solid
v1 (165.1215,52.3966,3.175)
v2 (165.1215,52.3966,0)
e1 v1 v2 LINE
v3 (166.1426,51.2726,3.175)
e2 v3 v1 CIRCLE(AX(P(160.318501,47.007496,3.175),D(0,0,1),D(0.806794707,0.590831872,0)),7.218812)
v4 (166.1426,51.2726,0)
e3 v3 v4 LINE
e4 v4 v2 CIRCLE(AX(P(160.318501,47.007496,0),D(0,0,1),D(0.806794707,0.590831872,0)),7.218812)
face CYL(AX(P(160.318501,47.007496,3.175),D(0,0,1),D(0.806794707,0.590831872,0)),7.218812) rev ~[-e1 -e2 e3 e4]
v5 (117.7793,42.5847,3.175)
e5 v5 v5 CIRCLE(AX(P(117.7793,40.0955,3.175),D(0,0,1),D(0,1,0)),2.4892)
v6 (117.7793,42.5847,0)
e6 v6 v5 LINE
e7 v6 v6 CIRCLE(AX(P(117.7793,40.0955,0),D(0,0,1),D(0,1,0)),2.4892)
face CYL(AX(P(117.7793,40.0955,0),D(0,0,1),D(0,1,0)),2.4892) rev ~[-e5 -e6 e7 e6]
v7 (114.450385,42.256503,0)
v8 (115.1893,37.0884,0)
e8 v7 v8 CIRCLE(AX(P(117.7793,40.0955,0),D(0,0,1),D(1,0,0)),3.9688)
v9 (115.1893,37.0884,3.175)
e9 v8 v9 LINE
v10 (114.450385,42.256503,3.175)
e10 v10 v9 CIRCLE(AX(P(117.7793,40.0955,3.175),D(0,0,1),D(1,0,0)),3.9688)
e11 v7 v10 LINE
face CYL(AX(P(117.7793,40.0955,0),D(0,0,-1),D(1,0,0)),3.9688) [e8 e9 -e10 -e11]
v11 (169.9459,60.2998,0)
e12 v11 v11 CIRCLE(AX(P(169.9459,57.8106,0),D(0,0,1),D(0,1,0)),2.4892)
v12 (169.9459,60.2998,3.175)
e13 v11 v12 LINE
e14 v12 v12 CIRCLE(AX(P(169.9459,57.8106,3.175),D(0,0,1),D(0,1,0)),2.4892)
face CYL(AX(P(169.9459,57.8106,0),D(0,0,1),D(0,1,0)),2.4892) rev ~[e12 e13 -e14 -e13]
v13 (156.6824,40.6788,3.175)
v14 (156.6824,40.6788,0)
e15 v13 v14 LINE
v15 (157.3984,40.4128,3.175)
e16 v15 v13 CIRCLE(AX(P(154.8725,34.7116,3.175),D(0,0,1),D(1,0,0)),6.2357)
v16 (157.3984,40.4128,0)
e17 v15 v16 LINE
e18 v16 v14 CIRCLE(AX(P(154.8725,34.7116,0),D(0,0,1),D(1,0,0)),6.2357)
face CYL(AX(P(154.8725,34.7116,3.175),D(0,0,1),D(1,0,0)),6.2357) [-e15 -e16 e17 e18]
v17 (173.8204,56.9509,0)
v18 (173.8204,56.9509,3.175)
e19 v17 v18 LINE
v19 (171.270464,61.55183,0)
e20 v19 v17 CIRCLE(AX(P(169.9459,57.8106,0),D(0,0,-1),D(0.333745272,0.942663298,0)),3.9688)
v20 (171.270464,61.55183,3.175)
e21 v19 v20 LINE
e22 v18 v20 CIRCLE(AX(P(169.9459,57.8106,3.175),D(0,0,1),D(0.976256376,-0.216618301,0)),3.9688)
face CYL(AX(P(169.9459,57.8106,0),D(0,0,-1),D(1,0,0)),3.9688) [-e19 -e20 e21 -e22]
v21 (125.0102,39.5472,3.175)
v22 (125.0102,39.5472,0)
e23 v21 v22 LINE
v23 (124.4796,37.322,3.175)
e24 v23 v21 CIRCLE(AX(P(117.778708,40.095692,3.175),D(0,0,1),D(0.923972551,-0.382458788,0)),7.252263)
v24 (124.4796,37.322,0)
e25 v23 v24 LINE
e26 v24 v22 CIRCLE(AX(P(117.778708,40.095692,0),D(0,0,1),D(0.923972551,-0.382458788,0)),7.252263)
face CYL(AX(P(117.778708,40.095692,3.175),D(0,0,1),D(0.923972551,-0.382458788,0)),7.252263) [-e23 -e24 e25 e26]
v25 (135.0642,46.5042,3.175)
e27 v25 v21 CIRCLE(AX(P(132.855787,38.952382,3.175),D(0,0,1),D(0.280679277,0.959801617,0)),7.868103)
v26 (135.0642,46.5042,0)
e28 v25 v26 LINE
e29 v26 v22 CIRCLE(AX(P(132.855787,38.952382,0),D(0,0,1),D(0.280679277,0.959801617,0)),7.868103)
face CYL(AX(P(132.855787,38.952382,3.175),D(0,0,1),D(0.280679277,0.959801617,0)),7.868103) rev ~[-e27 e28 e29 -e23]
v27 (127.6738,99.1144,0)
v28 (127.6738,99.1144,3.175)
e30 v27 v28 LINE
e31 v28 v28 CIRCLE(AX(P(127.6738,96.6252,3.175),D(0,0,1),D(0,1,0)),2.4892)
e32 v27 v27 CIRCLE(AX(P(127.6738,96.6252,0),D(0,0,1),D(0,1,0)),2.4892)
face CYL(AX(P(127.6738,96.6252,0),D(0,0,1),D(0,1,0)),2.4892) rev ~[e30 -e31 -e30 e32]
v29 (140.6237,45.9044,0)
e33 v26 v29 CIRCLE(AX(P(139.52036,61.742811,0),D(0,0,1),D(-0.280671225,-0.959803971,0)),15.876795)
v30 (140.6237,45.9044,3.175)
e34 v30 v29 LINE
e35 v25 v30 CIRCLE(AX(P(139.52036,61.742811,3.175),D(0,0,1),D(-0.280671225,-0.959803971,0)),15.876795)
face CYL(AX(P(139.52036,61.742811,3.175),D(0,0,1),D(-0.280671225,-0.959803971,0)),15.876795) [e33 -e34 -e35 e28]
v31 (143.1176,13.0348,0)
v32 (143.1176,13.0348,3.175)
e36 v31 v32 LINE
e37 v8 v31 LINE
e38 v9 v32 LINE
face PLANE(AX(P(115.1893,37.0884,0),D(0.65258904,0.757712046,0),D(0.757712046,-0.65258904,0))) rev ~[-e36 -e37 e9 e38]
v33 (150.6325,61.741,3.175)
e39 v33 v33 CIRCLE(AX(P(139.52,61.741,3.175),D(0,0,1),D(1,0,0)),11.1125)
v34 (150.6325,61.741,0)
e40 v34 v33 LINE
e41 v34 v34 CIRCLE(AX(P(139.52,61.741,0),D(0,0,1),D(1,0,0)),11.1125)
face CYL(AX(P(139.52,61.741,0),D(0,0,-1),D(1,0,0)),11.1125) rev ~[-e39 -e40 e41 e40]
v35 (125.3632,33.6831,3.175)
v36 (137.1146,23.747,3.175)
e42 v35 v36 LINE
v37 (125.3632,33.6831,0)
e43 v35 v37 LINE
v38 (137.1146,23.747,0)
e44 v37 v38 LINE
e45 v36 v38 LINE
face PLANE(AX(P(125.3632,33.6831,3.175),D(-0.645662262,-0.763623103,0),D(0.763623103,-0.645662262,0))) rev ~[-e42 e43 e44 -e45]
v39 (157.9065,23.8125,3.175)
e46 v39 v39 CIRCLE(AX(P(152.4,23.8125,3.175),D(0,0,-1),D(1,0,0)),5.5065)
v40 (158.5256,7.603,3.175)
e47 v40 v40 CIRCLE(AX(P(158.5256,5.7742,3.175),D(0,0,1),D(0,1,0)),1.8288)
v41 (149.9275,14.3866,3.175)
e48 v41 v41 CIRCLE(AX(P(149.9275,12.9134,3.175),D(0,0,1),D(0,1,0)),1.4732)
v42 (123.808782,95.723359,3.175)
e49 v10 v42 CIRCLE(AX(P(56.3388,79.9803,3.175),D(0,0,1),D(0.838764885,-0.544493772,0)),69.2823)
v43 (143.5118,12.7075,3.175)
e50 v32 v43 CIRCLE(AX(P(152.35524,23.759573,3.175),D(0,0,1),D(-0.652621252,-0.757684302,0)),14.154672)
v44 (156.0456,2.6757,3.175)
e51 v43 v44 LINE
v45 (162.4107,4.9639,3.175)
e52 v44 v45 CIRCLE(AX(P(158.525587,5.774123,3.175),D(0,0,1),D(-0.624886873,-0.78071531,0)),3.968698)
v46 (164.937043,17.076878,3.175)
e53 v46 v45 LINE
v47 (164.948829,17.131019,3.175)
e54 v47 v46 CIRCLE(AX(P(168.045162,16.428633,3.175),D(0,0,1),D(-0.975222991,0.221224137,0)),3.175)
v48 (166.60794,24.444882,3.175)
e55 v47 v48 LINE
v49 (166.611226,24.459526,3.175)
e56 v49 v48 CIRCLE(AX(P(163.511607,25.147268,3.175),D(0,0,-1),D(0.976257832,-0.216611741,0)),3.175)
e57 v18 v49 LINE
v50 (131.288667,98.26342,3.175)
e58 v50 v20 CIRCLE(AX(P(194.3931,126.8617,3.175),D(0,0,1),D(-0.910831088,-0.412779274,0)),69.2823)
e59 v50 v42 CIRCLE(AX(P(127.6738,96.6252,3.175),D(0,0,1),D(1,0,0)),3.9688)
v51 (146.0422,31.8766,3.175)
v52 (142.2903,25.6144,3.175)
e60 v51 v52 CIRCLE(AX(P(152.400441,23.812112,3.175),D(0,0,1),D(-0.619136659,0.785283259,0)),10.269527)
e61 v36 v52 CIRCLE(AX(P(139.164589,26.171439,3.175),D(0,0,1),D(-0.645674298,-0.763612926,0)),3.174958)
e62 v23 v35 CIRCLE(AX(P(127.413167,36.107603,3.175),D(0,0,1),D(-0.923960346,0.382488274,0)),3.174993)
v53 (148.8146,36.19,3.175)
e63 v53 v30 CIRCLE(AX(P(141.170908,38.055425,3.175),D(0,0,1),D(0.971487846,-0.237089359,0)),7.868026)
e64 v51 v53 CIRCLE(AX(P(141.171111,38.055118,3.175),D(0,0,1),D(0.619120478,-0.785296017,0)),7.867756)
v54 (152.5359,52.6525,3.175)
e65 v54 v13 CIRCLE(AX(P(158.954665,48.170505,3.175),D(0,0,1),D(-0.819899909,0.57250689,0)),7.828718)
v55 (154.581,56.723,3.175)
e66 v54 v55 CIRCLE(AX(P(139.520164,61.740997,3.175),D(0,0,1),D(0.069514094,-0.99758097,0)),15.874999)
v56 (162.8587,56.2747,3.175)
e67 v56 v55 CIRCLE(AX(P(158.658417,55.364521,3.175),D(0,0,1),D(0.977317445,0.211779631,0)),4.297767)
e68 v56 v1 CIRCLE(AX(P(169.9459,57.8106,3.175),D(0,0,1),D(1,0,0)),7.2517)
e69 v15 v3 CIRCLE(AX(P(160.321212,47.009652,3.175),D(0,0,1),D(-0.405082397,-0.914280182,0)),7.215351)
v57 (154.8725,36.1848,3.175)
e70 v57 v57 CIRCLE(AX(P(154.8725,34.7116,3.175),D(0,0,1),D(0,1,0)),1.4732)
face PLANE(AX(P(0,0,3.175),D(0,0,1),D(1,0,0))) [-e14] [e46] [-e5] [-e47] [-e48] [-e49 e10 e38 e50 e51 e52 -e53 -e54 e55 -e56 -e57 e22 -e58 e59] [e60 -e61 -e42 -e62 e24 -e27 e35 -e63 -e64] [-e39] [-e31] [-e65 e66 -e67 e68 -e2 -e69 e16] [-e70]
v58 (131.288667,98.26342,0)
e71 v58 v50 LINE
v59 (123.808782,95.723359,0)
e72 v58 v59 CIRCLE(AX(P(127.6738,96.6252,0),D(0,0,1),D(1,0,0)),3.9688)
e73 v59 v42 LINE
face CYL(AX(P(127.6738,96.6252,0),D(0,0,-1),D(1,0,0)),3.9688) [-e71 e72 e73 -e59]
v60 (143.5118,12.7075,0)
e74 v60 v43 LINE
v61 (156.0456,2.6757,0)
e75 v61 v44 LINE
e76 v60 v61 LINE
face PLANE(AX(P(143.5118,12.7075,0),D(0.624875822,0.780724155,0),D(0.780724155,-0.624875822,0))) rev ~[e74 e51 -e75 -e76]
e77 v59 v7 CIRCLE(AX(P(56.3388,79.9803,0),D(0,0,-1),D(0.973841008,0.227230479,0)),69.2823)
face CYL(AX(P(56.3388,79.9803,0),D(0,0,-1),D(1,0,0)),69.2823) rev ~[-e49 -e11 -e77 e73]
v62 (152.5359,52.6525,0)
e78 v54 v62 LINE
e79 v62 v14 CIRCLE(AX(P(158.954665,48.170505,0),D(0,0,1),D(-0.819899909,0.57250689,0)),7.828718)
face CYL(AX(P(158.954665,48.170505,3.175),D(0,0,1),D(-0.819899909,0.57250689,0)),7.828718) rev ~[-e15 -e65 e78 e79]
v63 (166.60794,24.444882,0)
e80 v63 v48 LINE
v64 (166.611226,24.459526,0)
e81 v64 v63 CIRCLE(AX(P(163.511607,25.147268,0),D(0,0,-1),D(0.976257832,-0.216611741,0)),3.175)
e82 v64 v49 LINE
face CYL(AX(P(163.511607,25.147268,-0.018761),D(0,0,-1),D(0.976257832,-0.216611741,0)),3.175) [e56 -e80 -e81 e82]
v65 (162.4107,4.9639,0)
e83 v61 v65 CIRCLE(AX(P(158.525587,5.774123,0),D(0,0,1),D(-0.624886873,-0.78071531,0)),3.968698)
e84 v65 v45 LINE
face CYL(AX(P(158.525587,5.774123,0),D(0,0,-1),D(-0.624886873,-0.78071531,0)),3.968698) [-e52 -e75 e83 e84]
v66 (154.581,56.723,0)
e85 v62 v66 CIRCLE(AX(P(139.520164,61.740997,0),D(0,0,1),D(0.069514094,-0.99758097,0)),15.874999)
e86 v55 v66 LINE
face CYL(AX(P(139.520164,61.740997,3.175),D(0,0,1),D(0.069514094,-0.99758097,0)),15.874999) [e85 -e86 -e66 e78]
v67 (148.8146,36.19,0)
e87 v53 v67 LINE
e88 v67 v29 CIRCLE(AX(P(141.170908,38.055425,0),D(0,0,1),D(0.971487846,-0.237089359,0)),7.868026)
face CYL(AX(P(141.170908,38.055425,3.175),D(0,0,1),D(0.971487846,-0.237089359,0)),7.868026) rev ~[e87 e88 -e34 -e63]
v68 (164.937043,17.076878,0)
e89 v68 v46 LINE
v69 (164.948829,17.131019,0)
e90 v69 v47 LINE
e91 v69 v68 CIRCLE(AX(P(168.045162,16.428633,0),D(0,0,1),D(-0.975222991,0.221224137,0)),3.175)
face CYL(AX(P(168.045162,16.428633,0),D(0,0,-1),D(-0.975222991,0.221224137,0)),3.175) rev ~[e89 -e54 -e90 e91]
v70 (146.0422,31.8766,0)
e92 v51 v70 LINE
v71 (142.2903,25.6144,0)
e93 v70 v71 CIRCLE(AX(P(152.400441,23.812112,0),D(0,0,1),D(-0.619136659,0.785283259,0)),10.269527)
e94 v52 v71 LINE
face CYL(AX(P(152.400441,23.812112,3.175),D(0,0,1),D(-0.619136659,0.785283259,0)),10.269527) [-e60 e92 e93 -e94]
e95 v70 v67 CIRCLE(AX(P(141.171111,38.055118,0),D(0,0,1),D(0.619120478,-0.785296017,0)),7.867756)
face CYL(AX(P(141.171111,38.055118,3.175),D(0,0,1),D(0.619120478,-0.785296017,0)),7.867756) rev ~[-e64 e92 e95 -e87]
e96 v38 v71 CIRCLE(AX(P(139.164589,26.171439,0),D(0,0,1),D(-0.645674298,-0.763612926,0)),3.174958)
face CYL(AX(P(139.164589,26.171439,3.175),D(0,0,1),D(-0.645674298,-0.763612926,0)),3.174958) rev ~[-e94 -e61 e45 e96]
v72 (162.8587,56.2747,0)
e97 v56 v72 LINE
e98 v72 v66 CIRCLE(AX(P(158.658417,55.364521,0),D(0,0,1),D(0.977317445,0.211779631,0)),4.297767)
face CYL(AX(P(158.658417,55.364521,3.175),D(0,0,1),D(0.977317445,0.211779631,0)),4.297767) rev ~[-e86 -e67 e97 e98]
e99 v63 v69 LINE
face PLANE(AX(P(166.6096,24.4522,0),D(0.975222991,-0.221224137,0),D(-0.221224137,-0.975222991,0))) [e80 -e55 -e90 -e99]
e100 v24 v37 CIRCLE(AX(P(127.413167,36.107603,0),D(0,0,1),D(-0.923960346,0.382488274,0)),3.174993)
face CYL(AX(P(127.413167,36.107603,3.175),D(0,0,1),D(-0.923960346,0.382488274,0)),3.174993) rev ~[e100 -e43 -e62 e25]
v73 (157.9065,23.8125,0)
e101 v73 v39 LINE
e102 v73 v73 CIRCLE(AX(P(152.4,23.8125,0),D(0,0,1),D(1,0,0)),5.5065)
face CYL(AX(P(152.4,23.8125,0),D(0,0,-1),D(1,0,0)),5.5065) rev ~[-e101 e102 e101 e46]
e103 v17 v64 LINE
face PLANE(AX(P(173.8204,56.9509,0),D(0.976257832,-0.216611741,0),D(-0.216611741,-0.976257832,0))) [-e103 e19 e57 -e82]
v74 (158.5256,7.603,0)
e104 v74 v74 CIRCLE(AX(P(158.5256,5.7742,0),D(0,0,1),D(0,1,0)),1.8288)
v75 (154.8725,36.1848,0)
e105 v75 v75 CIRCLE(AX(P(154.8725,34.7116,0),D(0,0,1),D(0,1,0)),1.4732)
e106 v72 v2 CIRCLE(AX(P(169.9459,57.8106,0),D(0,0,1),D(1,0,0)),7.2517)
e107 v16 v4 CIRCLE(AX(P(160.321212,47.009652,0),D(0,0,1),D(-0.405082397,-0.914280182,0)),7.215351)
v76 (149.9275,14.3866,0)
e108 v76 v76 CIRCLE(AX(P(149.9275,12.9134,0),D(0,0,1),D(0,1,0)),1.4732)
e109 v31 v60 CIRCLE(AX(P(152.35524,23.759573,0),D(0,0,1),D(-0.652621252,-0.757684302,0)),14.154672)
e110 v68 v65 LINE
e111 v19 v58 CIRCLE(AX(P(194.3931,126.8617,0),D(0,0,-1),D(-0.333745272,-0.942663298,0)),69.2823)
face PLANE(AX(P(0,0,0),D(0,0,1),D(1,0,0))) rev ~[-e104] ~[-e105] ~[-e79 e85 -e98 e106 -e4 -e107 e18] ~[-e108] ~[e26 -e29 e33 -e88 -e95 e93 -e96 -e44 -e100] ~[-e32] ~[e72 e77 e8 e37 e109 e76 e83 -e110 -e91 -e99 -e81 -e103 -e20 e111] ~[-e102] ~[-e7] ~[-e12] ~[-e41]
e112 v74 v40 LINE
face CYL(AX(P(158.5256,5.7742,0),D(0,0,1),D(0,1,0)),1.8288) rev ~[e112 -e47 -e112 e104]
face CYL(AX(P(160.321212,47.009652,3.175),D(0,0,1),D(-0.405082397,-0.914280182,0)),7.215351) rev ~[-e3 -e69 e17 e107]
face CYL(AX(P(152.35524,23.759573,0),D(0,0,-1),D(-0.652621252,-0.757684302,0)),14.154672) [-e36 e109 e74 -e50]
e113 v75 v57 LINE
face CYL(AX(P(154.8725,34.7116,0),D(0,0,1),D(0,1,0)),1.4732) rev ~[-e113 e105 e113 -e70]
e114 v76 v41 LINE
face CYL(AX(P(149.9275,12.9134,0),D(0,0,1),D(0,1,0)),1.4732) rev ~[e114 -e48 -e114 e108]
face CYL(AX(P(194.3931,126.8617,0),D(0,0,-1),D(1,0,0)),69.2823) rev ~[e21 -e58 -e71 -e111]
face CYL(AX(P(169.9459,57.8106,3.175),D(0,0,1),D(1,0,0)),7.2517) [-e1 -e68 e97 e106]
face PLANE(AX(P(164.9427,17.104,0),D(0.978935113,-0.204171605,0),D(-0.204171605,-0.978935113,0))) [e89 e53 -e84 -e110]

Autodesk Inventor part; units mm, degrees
ref_plane "YZ Plane" through (0, 0, 0) normal (1, 0, 0) x (0, 1, 0)
ref_plane "XZ Plane" through (0, 0, 0) normal (0, 1, 0) x (-1, 0, 0)
ref_plane "XY Plane" through (0, 0, 0) normal (0, 0, 1) x (1, 0, 0)
sketch "Sketch1" plane through (0, 0, 0) normal (0, 0, 1) x (1, 0, 0)
  line L0 (0, 0) -> (304.8, 0) construction
  line L1 (304.8, 0) -> (304.8, 50.8) construction
  line L2 (304.8, 50.8) -> (0, 50.8) construction
  line L3 (0, 50.8) -> (0, 0) construction
  circle A0 centre (152.4, 23.8125) radius 6.35 construction
  circle A1 centre (152.4, 23.8125) radius 34.29 construction
  circle A2 centre (152.4, 23.8125) radius 22.225 construction
  line L4 (152.4, 23.8125) -> (139.52, 61.741) construction
  circle A3 centre (139.52, 61.741) radius 9.525 construction
  circle A4 centre (139.52, 61.741) radius 17.78 construction
  circle A5 centre (91.5619, 85.09) radius 31.75 construction
  circle A6 centre (163.3424, 109.4657) radius 31.75 construction
  circle A7 centre (222.6465, 85.09) radius 31.75 construction
  line L5 (0, 50.8) -> (0, 53.34) construction
  line L6 (0, 53.34) -> (304.8, 53.34) construction
  line L7 (304.8, 53.34) -> (304.8, 50.8) construction
  circle A8 centre (139.52, 61.741) radius 21.59 construction
  circle A9 centre (152.4, 23.8125) radius 46.99 construction
  circle A10 centre (152.4, 23.8125) radius 50.8 construction
  arc A11 (86.3865, 79.4564) -> (92.4363, 92.6899) centre (91.5619, 85.09) ccw construction
  circle A12 centre (163.3424, 109.4657) radius 7.65 construction
  arc A13 (222.2546, 92.73) -> (226.29, 78.3634) centre (222.6465, 85.09) ccw construction
  circle A14 centre (163.3424, 109.4657) radius 9.1 construction
  circle A15 centre (139.52, 61.741) radius 22.9 construction
  line L8 (86.3865, 79.4564) -> (124.0276, 44.8769) construction
  line L9 (170.8782, 108.1486) -> (162.078, 57.7984) construction
  line L10 (92.4363, 92.6899) -> (91.5619, 85.09) construction
  line L11 (91.5619, 85.09) -> (86.3865, 79.4564) construction
  circle A16 centre (127.6738, 96.6252) radius 3.9688
  circle A17 centre (127.6738, 96.6252) radius 7.9375 construction
  line L12 (92.4363, 92.6899) -> (126.7664, 88.7398) construction
  line L13 (133.1953, 90.9229) -> (158.0208, 114.9615) construction
  line L14 (158.0208, 114.9615) -> (163.3424, 109.4657) construction
  line L15 (170.8782, 108.1486) -> (163.3424, 109.4657) construction
  line L16 (139.52, 61.741) -> (127.6738, 96.6252) construction
  line L17 (91.5619, 85.09) -> (163.3424, 109.4657) construction
  line L18 (152.4, 23.8125) -> (91.5619, 85.09) construction
  line L19 (152.4, 23.8125) -> (163.3424, 109.4657) construction
  circle A18 centre (127.6738, 96.6252) radius 9.2075 construction
  circle A19 centre (127.6738, 96.6252) radius 6.1595 construction
  arc A20 (92.4363, 92.6899) -> (86.3865, 79.4564) centre (91.5619, 85.09) ccw construction
  circle A21 centre (163.3424, 109.4657) radius 25.4 construction
  circle A22 centre (222.6465, 85.09) radius 25.4 construction
  line L20 (104.7627, 113.9656) -> (78.361, 56.2144) construction
  circle A23 centre (91.5619, 85.09) radius 25.4 construction
  line L21 (214.0607, 115.6571) -> (231.2324, 54.5229) construction
  line L22 (56.0019, 185.6657) -> (208.4019, 185.6657)
  line L23 (208.4019, 185.6657) -> (208.4019, -4.8343)
  line L24 (208.4019, -4.8343) -> (56.0019, -4.8343)
  line L25 (56.0019, -4.8343) -> (56.0019, 185.6657)
  circle A24 centre (139.52, 61.741) radius 11.1125
  arc A25 (226.1312, 75.4959) -> (221.6192, 95.3086) centre (223.8752, 85.4023) ccw construction
  line L26 (221.4349, 84.7168) -> (229.5152, 60.6363) construction
  line L27 (223.8752, 85.4023) -> (229.5152, 60.6363) construction
  line L28 (221.4349, 84.7168) -> (213.3547, 108.7973) construction
  line L29 (223.8752, 85.4023) -> (218.2352, 110.1682) construction
  arc A26 (212.5972, 111.0549) -> (214.1122, 106.5398) centre (213.3547, 108.7973) ccw construction
  arc A27 (218.764, 107.8464) -> (217.7065, 112.49) centre (218.2352, 110.1682) ccw construction
  arc A28 (218.764, 107.8464) -> (214.1122, 106.5398) centre (229.5152, 60.6363) ccw construction
  arc A29 (217.7065, 112.49) -> (212.5972, 111.0549) centre (229.5152, 60.6363) ccw construction
  line L30 (213.3547, 108.7973) -> (212.5972, 111.0549) construction
  line L31 (218.2352, 110.1682) -> (217.7065, 112.49) construction
  arc A30 (221.6192, 95.3086) -> (218.2029, 94.349) centre (229.5152, 60.6363) ccw construction
  arc A31 (226.1312, 75.4959) -> (224.667, 75.0846) centre (229.5152, 60.6363) ccw construction
  line L32 (104.4015, 107.0791) -> (92.7013, 84.5343) construction
  line L33 (81.0012, 61.9895) -> (90.3961, 85.5882) construction
  arc A32 (100.6718, 111.3992) -> (98.9102, 106.9744) centre (99.791, 109.1868) ccw construction
  arc A33 (103.3046, 104.9655) -> (105.4983, 109.1926) centre (104.4015, 107.0791) ccw construction
  arc A34 (103.3046, 104.9655) -> (98.9102, 106.9744) centre (81.0012, 61.9895) ccw construction
  line L34 (99.791, 109.1868) -> (100.6718, 111.3992) construction
  line L35 (104.4015, 107.0791) -> (105.4983, 109.1926) construction
  arc A35 (105.4983, 109.1926) -> (100.6718, 111.3992) centre (81.0012, 61.9895) ccw construction
  arc A36 (218.2029, 94.349) -> (224.667, 75.0846) centre (221.4349, 84.7168) ccw construction
  arc A37 (88.0213, 75.5164) -> (97.3814, 93.5522) centre (92.7013, 84.5343) ccw construction
  line L36 (90.3961, 85.5882) -> (99.791, 109.1868) construction
  line L37 (92.7013, 84.5343) -> (81.0012, 61.9895) construction
  arc A38 (88.0213, 75.5164) -> (86.6381, 76.1487) centre (81.0012, 61.9895) ccw construction
  arc A39 (97.3814, 93.5522) -> (94.1541, 95.0276) centre (81.0012, 61.9895) ccw construction
  arc A40 (94.1541, 95.0276) -> (86.6381, 76.1487) centre (90.3961, 85.5882) ccw construction
  line L38 (163.3424, 109.4657) -> (140.8985, 121.3583) construction
  line L39 (163.3424, 109.4657) -> (185.7862, 97.5731) construction
  circle A41 centre (139.52, 61.741) radius 26.71 construction
  line L40 (222.2546, 92.73) -> (138.1517, 88.4159) construction
  line L41 (226.29, 78.3634) -> (152.2412, 38.2549) construction
  line L42 (222.6465, 85.09) -> (222.2546, 92.73) construction
  line L43 (222.6465, 85.09) -> (226.29, 78.3634) construction
  line L44 (139.52, 61.741) -> (138.1517, 88.4159) construction
  line L45 (139.52, 61.741) -> (152.2412, 38.2549) construction
  arc A42 (226.29, 78.3634) -> (222.2546, 92.73) centre (222.6465, 85.09) ccw construction
  arc A43 (226.29, 78.3634) -> (225.5574, 78.0155) centre (222.6465, 85.09) ccw construction
  line L46 (139.52, 61.741) -> (222.6465, 85.09) construction
  circle A44 centre (139.52, 61.741) radius 15.875
  circle A45 centre (117.7793, 40.0955) radius 3.9688
  circle A46 centre (169.9459, 57.8106) radius 3.9688
  circle A47 centre (56.3388, 79.9803) radius 69.2823
  circle A48 centre (194.3931, 126.8617) radius 69.2823
  arc A49 (163.3226, 14.7011) -> (164.9427, 17.104) centre (152.4, 23.8125) ccw
  circle A50 centre (152.4, 23.8125) radius 11.176 construction
  circle A51 centre (152.4, 23.8125) radius 19.05 construction
  line L47 (115.1893, 37.0884) -> (143.1176, 13.0348)
  line L48 (152.4, 23.8125) -> (143.1176, 13.0348) construction
  line L49 (173.8315, 57.0025) -> (166.326, 20.9161) construction
  line L50 (152.4, 23.8125) -> (166.326, 20.9161) construction
  arc A52 (154.6674, 4.8437) -> (156.0456, 2.6757) centre (158.5256, 5.7742) ccw
  line L51 (152.4, 23.8125) -> (158.5256, 5.7742) construction
  arc A53 (156.9738, 10.3439) -> (163.3226, 14.7011) centre (152.4, 23.8125) ccw
  arc A54 (150.0325, 9.7869) -> (156.9738, 10.3439) centre (152.4, 23.8125) ccw
  arc A55 (157.2494, 9.5322) -> (154.6674, 4.8437) centre (158.5256, 5.7742) ccw
  arc A56 (162.061, 7.5775) -> (157.2494, 9.5322) centre (158.5256, 5.7742) ccw
  line L52 (143.5118, 12.7075) -> (156.0456, 2.6757)
  line L53 (162.3795, 4.8266) -> (166.2126, 20.4164) construction
  line L54 (143.5118, 12.7075) -> (152.4, 23.8125) construction
  line L55 (152.4, 23.8125) -> (166.2126, 20.4164) construction
  arc A57 (166.2126, 20.4164) -> (166.326, 20.9161) centre (152.4, 23.8125) ccw
  arc A58 (166.326, 20.9161) -> (166.6096, 24.4522) centre (152.4, 23.8125) ccw construction
  arc A59 (143.1176, 13.0348) -> (143.5118, 12.7075) centre (152.4, 23.8125) ccw
  arc A60 (143.5118, 12.7075) -> (150.0325, 9.7869) centre (152.4, 23.8125) ccw
  circle A61 centre (152.4, 23.8125) radius 5.5065
  line L56 (152.4, 23.8125) -> (166.2715, 20.6657)
  line L57 (166.6096, 24.4522) -> (164.9427, 17.104)
  arc A62 (164.9427, 17.104) -> (166.2126, 20.4164) centre (152.4, 23.8125) ccw construction
  line L58 (164.9427, 17.104) -> (162.4107, 4.9639)
  line L59 (158.5256, 5.7742) -> (162.4107, 4.9639) construction
  arc A63 (166.6096, 24.4522) -> (143.1176, 13.0348) centre (152.4, 23.8125) ccw
  line L60 (169.9459, 57.8106) -> (173.8204, 56.9509) construction
  line L61 (173.8204, 56.9509) -> (166.6096, 24.4522)
  line L62 (154.8725, 34.7116) -> (149.9275, 12.9134) construction
  circle A64 centre (154.8725, 34.7116) radius 2.1082
  circle A65 centre (149.9275, 12.9134) radius 2.1082
  arc A66 (162.4107, 4.9639) -> (162.061, 7.5775) centre (158.5256, 5.7742) ccw
  arc A67 (156.0456, 2.6757) -> (162.4107, 4.9639) centre (158.5256, 5.7742) ccw
  point P0 (215.7779, 109.5437)
  point P1 (102.1225, 108.1905)
  point P2 (145.0256, 46.8513)
  point P3 (171.2705, 61.5518)
  point P4 (114.4504, 42.2565)
  point P5 (131.2886, 98.2635)
  point P6 (123.8088, 95.7234)
  dimension "d127" = 31.75
  dimension "d150" = 38.1
  dimension "d1" = 50.8
  dimension "d3" = 23.8125
  dimension "d4" = 152.4
  dimension "d7" = 68.58
  dimension "d8" = 44.45
  dimension "d9" = 19.05
  dimension "d10" = 35.56
  dimension "d11" = 40.0558
  dimension "d12" = 63.5
  dimension "d13" = 63.5
  dimension "d14" = 63.5
  dimension "d15" = 2.54
  dimension "d16" = 304.8
  dimension "d17" = 43.18
  dimension "d18" = 93.98
  dimension "d19" = 101.6
  dimension "d21" = 15.3
  dimension "d22" = 15.3
  dimension "d24" = 18.2
  dimension "d29" = 45.8
  dimension "d30" = 143.991
  dimension "d31" = 7.9375
  dimension "d32" = 15.875
  dimension "d33" = 143.991
  dimension "d35" = 18.415
  dimension "d37" = 12.319
  dimension "d40" = 50.8
  dimension "d41" = 50.8
  dimension "d42" = 18.004
  dimension "d43" = 18.004
  dimension "d44" = 50.8
  dimension "d53" = 152.4
  dimension "d54" = 190.5
  dimension "d55" = 35.56
  dimension "d56" = 76.2
  dimension "d57" = 22.225
  dimension "d67" = 25.4
  dimension "d68" = 25.4
  dimension "d69" = 2.86
  dimension "d70" = 25.4
  dimension "d71" = 25.4
  dimension "d72" = 4.7625
  dimension "d75" = 2.86
  dimension "d80" = 4.7625
  dimension "d82" = 4.7625
  dimension "d83" = 50.8
  dimension "d84" = 50.8
  dimension "d85" = 10.16
  dimension "d97" = 48.4188
  dimension "d99" = 20.32
  dimension "d101" = 25.4
  dimension "d102" = 25.4
  dimension "d103" = 10.16
  dimension "d105" = 18.004
  dimension "d106" = 18.004
  dimension "d107" = 53.42
  dimension "d108" = 154.494
  dimension "d109" = 7.65
  dimension "d111" = 86.3435
  dimension "d112" = 12.753
  dimension "d113" = 12.753
  dimension "d135" = 7.9375
  dimension "d136" = 7.9375
  dimension "d149" = 22.352
extrude "Extrusion3" add sketch "Sketch1" along normal blind 3.175 contours A16 | A16 A48 A44 A47 | A48 A46 L61 A63 L47 A45 A47 A44 | A44 | A46 | A45 | L57 A49 A53 A54 A60 A59 A63 | A60 A54 A53 A49 L58 A66 A56 A55 A52 L52 | A52 A55 A56 A66 A67 | A64 | A65
hole "Hole3" at (81.0012, 61.9895, 0) at (229.5152, 60.6363, 0) at (185.7862, 97.5731, 0) at (215.7779, 109.5437, 0) at (117.7793, 40.0955, 0) at (169.9459, 57.8106, 0) at (127.6738, 96.6252, 0) direction (0, 0, 1) diameter 4.9784 end through all clearance for "Socket Head Cap Screw" size "#10" standard "Ansi Unified Screw Threads"
hole "Hole4" at (100.6718, 111.3992, 0) at (105.4983, 109.1926, 0) at (140.8985, 121.3583, 0) at (102.1225, 108.1905, 0) at (158.5256, 5.7742, 0) direction (0, 0, 1) diameter 3.6576 end through all clearance for "Flat Head Machine Screw (82)" size "#6" standard "Ansi Unified Screw Threads"
hole "Hole5" at (154.8725, 34.7116, 0) at (149.9275, 12.9134, 0) direction (0, 0, 1) diameter 2.9464 end through all clearance for "Socket Head Cap Screw" size "#4" standard "Ansi Unified Screw Threads"
fillet "Fillet2" radius 3.175 2 edges at (164.9427, 17.104, 1.5875) (166.6096, 24.4522, 1.5875)
sketch "Sketch3" plane through (0, 0, 3.175) normal (0, 0, 1) x (1, 0, 0)
  circle A0 centre (152.4, 23.8125) radius 5.5065 projected
  circle A1 centre (139.52, 61.741) radius 11.1125 projected
  circle A2 centre (117.7793, 40.0955) radius 2.4892 projected
  circle A3 centre (149.9275, 12.9134) radius 1.4732 projected
  circle A4 centre (154.8725, 34.7116) radius 1.4732 projected
  arc A5 (142.2903, 25.6144) -> (146.0422, 31.8766) centre (152.4, 23.8125) ccw
  circle A6 centre (154.8725, 34.7116) radius 6.2357
  arc A7 (125.0102, 39.5472) -> (124.4796, 37.322) centre (117.7793, 40.0955) ccw
  arc A8 (140.6237, 45.9044) -> (135.0642, 46.5042) centre (139.52, 61.741) ccw
  arc A9 (125.0102, 39.5472) -> (135.0642, 46.5042) centre (132.8558, 38.9523) ccw construction
  arc A10 (140.6237, 45.9044) -> (146.0422, 31.8766) centre (141.1708, 38.0554) ccw construction
  line L0 (117.7793, 40.0955) -> (125.3632, 33.6831)
  arc A11 (125.3632, 33.6831) -> (124.4796, 37.322) centre (127.4132, 36.1076) ccw construction
  arc A12 (137.1146, 23.747) -> (142.2903, 25.6144) centre (139.1646, 26.1715) ccw
  arc A13 (124.4796, 37.322) -> (125.3632, 33.6831) centre (127.4132, 36.1076) ccw
  arc A14 (135.0642, 46.5042) -> (125.0102, 39.5472) centre (132.8558, 38.9523) ccw
  arc A15 (124.4796, 37.322) -> (125.0102, 39.5472) centre (117.7793, 40.0955) ccw
  arc A16 (135.0642, 46.5042) -> (140.6237, 45.9044) centre (139.52, 61.741) ccw
  arc A17 (148.8146, 36.19) -> (140.6237, 45.9044) centre (141.1708, 38.0554) ccw
  arc A18 (146.0422, 31.8766) -> (148.8146, 36.19) centre (141.1708, 38.0554) ccw
  arc A19 (146.0422, 31.8766) -> (142.2903, 25.6144) centre (152.4, 23.8125) ccw
  arc A20 (142.2903, 25.6144) -> (137.1146, 23.747) centre (139.1646, 26.1715) ccw construction
  line L1 (137.1146, 23.747) -> (149.9275, 12.9134)
  line L2 (125.3632, 33.6831) -> (137.1146, 23.747)
  line L3 (166.6112, 24.4595) -> (173.8204, 56.9509) projected
  arc A21 (131.2886, 98.2635) -> (171.2705, 61.5518) centre (194.3931, 126.8617) ccw projected
  circle A22 centre (169.9459, 57.8106) radius 2.4892 projected
  arc A23 (152.5359, 52.6525) -> (156.6824, 40.6788) centre (158.9547, 48.1705) ccw
  arc A24 (156.6824, 40.6788) -> (152.5359, 52.6525) centre (158.9547, 48.1705) ccw construction
  circle A25 centre (169.9459, 57.8106) radius 7.2517
  arc A26 (154.581, 56.723) -> (162.8587, 56.2747) centre (158.6584, 55.3645) ccw construction
  arc A27 (162.8587, 56.2747) -> (154.581, 56.723) centre (158.6584, 55.3645) ccw
  arc A28 (165.1215, 52.3966) -> (157.3984, 40.4128) centre (160.3212, 47.0097) ccw construction
  line L4 (168.0799, 48.6677) -> (166.1231, 39.8486) construction
  arc A29 (166.1426, 51.2726) -> (165.1215, 52.3966) centre (160.3212, 47.0097) ccw
  arc A30 (157.3984, 40.4128) -> (166.1426, 51.2726) centre (160.3212, 47.0097) ccw
  point P0 (0, 0)
  dimension "d194" = 4.7625
  dimension "d195" = 4.7625
  dimension "d196" = 4.7625
  dimension "d197" = 4.7625
  dimension "d200" = 6.35
  dimension "d201" = 6.35
  dimension "d204" = 4.7625
  dimension "d205" = 4.7625
  dimension "d206" = 6.35
  dimension "d208" = 3.81
extrude "Extrusion5" cut sketch "Sketch3" against normal through all contours A19 A12 L2 A13 A15 A14 A16 A17 A18 | A6 A23 A8 A27 A25 A29 A30
equation "\"d8\" = Gear35tPD"
equation "\"d9\" = Gear15tPD"
equation "\"d10\" = Gear28tPD"
equation "\"d11\" = 0.5 * Gear48tPD + 0.5 * Gear15tPD + MeshingClearance"
equation "\"d12\" = CimOD"
equation "\"d13\" = CimOD"
equation "\"d14\" = CimOD"
equation "\"d17\" = Gear28tPD + ClearanceDiameter"
equation "\"d18\" = WheelOD"
equation "\"d19\" = WheelClearance"
equation "\"Pulley48tPD\" = 45.8"
equation "\"Pulley19tPD\" = 18.2"
equation "\"Pulley16tPD\" = 15.3"
equation "\"Gear15tPD\" = 19.05"
equation "\"Gear35tPD\" = 44.45"
equation "\"Gear48tPD\" = 60.96"
equation "\"Gear28tPD\" = 35.56"
equation "\"BearingLargeOD\" = 28.575"
equation "\"BearingSmallOD\" = 22.225"
equation "\"MeshingClearance\" = 0.0508"
equation "\"CimOD\" = 63.5"
equation "\"WheelOD\" = 93.98"
equation "\"ClearanceDiameter\" = 7.62"
equation "\"WheelClearance\" = 101.6"
equation "\"TensioningBearingID\" = 6.35"
equation "\"TensioningBearingOD\" = 15.875"
equation "\"SpingClipClearance\" = 8.89"
equation "\"Pi\" = 79.79645"
equation "\"Pulley56tPD\" = 53.5"
equation "\"BearingXLargeOD\" = 34.925"
properties part number "OutlineSketch1" material "Aluminum 6061"
